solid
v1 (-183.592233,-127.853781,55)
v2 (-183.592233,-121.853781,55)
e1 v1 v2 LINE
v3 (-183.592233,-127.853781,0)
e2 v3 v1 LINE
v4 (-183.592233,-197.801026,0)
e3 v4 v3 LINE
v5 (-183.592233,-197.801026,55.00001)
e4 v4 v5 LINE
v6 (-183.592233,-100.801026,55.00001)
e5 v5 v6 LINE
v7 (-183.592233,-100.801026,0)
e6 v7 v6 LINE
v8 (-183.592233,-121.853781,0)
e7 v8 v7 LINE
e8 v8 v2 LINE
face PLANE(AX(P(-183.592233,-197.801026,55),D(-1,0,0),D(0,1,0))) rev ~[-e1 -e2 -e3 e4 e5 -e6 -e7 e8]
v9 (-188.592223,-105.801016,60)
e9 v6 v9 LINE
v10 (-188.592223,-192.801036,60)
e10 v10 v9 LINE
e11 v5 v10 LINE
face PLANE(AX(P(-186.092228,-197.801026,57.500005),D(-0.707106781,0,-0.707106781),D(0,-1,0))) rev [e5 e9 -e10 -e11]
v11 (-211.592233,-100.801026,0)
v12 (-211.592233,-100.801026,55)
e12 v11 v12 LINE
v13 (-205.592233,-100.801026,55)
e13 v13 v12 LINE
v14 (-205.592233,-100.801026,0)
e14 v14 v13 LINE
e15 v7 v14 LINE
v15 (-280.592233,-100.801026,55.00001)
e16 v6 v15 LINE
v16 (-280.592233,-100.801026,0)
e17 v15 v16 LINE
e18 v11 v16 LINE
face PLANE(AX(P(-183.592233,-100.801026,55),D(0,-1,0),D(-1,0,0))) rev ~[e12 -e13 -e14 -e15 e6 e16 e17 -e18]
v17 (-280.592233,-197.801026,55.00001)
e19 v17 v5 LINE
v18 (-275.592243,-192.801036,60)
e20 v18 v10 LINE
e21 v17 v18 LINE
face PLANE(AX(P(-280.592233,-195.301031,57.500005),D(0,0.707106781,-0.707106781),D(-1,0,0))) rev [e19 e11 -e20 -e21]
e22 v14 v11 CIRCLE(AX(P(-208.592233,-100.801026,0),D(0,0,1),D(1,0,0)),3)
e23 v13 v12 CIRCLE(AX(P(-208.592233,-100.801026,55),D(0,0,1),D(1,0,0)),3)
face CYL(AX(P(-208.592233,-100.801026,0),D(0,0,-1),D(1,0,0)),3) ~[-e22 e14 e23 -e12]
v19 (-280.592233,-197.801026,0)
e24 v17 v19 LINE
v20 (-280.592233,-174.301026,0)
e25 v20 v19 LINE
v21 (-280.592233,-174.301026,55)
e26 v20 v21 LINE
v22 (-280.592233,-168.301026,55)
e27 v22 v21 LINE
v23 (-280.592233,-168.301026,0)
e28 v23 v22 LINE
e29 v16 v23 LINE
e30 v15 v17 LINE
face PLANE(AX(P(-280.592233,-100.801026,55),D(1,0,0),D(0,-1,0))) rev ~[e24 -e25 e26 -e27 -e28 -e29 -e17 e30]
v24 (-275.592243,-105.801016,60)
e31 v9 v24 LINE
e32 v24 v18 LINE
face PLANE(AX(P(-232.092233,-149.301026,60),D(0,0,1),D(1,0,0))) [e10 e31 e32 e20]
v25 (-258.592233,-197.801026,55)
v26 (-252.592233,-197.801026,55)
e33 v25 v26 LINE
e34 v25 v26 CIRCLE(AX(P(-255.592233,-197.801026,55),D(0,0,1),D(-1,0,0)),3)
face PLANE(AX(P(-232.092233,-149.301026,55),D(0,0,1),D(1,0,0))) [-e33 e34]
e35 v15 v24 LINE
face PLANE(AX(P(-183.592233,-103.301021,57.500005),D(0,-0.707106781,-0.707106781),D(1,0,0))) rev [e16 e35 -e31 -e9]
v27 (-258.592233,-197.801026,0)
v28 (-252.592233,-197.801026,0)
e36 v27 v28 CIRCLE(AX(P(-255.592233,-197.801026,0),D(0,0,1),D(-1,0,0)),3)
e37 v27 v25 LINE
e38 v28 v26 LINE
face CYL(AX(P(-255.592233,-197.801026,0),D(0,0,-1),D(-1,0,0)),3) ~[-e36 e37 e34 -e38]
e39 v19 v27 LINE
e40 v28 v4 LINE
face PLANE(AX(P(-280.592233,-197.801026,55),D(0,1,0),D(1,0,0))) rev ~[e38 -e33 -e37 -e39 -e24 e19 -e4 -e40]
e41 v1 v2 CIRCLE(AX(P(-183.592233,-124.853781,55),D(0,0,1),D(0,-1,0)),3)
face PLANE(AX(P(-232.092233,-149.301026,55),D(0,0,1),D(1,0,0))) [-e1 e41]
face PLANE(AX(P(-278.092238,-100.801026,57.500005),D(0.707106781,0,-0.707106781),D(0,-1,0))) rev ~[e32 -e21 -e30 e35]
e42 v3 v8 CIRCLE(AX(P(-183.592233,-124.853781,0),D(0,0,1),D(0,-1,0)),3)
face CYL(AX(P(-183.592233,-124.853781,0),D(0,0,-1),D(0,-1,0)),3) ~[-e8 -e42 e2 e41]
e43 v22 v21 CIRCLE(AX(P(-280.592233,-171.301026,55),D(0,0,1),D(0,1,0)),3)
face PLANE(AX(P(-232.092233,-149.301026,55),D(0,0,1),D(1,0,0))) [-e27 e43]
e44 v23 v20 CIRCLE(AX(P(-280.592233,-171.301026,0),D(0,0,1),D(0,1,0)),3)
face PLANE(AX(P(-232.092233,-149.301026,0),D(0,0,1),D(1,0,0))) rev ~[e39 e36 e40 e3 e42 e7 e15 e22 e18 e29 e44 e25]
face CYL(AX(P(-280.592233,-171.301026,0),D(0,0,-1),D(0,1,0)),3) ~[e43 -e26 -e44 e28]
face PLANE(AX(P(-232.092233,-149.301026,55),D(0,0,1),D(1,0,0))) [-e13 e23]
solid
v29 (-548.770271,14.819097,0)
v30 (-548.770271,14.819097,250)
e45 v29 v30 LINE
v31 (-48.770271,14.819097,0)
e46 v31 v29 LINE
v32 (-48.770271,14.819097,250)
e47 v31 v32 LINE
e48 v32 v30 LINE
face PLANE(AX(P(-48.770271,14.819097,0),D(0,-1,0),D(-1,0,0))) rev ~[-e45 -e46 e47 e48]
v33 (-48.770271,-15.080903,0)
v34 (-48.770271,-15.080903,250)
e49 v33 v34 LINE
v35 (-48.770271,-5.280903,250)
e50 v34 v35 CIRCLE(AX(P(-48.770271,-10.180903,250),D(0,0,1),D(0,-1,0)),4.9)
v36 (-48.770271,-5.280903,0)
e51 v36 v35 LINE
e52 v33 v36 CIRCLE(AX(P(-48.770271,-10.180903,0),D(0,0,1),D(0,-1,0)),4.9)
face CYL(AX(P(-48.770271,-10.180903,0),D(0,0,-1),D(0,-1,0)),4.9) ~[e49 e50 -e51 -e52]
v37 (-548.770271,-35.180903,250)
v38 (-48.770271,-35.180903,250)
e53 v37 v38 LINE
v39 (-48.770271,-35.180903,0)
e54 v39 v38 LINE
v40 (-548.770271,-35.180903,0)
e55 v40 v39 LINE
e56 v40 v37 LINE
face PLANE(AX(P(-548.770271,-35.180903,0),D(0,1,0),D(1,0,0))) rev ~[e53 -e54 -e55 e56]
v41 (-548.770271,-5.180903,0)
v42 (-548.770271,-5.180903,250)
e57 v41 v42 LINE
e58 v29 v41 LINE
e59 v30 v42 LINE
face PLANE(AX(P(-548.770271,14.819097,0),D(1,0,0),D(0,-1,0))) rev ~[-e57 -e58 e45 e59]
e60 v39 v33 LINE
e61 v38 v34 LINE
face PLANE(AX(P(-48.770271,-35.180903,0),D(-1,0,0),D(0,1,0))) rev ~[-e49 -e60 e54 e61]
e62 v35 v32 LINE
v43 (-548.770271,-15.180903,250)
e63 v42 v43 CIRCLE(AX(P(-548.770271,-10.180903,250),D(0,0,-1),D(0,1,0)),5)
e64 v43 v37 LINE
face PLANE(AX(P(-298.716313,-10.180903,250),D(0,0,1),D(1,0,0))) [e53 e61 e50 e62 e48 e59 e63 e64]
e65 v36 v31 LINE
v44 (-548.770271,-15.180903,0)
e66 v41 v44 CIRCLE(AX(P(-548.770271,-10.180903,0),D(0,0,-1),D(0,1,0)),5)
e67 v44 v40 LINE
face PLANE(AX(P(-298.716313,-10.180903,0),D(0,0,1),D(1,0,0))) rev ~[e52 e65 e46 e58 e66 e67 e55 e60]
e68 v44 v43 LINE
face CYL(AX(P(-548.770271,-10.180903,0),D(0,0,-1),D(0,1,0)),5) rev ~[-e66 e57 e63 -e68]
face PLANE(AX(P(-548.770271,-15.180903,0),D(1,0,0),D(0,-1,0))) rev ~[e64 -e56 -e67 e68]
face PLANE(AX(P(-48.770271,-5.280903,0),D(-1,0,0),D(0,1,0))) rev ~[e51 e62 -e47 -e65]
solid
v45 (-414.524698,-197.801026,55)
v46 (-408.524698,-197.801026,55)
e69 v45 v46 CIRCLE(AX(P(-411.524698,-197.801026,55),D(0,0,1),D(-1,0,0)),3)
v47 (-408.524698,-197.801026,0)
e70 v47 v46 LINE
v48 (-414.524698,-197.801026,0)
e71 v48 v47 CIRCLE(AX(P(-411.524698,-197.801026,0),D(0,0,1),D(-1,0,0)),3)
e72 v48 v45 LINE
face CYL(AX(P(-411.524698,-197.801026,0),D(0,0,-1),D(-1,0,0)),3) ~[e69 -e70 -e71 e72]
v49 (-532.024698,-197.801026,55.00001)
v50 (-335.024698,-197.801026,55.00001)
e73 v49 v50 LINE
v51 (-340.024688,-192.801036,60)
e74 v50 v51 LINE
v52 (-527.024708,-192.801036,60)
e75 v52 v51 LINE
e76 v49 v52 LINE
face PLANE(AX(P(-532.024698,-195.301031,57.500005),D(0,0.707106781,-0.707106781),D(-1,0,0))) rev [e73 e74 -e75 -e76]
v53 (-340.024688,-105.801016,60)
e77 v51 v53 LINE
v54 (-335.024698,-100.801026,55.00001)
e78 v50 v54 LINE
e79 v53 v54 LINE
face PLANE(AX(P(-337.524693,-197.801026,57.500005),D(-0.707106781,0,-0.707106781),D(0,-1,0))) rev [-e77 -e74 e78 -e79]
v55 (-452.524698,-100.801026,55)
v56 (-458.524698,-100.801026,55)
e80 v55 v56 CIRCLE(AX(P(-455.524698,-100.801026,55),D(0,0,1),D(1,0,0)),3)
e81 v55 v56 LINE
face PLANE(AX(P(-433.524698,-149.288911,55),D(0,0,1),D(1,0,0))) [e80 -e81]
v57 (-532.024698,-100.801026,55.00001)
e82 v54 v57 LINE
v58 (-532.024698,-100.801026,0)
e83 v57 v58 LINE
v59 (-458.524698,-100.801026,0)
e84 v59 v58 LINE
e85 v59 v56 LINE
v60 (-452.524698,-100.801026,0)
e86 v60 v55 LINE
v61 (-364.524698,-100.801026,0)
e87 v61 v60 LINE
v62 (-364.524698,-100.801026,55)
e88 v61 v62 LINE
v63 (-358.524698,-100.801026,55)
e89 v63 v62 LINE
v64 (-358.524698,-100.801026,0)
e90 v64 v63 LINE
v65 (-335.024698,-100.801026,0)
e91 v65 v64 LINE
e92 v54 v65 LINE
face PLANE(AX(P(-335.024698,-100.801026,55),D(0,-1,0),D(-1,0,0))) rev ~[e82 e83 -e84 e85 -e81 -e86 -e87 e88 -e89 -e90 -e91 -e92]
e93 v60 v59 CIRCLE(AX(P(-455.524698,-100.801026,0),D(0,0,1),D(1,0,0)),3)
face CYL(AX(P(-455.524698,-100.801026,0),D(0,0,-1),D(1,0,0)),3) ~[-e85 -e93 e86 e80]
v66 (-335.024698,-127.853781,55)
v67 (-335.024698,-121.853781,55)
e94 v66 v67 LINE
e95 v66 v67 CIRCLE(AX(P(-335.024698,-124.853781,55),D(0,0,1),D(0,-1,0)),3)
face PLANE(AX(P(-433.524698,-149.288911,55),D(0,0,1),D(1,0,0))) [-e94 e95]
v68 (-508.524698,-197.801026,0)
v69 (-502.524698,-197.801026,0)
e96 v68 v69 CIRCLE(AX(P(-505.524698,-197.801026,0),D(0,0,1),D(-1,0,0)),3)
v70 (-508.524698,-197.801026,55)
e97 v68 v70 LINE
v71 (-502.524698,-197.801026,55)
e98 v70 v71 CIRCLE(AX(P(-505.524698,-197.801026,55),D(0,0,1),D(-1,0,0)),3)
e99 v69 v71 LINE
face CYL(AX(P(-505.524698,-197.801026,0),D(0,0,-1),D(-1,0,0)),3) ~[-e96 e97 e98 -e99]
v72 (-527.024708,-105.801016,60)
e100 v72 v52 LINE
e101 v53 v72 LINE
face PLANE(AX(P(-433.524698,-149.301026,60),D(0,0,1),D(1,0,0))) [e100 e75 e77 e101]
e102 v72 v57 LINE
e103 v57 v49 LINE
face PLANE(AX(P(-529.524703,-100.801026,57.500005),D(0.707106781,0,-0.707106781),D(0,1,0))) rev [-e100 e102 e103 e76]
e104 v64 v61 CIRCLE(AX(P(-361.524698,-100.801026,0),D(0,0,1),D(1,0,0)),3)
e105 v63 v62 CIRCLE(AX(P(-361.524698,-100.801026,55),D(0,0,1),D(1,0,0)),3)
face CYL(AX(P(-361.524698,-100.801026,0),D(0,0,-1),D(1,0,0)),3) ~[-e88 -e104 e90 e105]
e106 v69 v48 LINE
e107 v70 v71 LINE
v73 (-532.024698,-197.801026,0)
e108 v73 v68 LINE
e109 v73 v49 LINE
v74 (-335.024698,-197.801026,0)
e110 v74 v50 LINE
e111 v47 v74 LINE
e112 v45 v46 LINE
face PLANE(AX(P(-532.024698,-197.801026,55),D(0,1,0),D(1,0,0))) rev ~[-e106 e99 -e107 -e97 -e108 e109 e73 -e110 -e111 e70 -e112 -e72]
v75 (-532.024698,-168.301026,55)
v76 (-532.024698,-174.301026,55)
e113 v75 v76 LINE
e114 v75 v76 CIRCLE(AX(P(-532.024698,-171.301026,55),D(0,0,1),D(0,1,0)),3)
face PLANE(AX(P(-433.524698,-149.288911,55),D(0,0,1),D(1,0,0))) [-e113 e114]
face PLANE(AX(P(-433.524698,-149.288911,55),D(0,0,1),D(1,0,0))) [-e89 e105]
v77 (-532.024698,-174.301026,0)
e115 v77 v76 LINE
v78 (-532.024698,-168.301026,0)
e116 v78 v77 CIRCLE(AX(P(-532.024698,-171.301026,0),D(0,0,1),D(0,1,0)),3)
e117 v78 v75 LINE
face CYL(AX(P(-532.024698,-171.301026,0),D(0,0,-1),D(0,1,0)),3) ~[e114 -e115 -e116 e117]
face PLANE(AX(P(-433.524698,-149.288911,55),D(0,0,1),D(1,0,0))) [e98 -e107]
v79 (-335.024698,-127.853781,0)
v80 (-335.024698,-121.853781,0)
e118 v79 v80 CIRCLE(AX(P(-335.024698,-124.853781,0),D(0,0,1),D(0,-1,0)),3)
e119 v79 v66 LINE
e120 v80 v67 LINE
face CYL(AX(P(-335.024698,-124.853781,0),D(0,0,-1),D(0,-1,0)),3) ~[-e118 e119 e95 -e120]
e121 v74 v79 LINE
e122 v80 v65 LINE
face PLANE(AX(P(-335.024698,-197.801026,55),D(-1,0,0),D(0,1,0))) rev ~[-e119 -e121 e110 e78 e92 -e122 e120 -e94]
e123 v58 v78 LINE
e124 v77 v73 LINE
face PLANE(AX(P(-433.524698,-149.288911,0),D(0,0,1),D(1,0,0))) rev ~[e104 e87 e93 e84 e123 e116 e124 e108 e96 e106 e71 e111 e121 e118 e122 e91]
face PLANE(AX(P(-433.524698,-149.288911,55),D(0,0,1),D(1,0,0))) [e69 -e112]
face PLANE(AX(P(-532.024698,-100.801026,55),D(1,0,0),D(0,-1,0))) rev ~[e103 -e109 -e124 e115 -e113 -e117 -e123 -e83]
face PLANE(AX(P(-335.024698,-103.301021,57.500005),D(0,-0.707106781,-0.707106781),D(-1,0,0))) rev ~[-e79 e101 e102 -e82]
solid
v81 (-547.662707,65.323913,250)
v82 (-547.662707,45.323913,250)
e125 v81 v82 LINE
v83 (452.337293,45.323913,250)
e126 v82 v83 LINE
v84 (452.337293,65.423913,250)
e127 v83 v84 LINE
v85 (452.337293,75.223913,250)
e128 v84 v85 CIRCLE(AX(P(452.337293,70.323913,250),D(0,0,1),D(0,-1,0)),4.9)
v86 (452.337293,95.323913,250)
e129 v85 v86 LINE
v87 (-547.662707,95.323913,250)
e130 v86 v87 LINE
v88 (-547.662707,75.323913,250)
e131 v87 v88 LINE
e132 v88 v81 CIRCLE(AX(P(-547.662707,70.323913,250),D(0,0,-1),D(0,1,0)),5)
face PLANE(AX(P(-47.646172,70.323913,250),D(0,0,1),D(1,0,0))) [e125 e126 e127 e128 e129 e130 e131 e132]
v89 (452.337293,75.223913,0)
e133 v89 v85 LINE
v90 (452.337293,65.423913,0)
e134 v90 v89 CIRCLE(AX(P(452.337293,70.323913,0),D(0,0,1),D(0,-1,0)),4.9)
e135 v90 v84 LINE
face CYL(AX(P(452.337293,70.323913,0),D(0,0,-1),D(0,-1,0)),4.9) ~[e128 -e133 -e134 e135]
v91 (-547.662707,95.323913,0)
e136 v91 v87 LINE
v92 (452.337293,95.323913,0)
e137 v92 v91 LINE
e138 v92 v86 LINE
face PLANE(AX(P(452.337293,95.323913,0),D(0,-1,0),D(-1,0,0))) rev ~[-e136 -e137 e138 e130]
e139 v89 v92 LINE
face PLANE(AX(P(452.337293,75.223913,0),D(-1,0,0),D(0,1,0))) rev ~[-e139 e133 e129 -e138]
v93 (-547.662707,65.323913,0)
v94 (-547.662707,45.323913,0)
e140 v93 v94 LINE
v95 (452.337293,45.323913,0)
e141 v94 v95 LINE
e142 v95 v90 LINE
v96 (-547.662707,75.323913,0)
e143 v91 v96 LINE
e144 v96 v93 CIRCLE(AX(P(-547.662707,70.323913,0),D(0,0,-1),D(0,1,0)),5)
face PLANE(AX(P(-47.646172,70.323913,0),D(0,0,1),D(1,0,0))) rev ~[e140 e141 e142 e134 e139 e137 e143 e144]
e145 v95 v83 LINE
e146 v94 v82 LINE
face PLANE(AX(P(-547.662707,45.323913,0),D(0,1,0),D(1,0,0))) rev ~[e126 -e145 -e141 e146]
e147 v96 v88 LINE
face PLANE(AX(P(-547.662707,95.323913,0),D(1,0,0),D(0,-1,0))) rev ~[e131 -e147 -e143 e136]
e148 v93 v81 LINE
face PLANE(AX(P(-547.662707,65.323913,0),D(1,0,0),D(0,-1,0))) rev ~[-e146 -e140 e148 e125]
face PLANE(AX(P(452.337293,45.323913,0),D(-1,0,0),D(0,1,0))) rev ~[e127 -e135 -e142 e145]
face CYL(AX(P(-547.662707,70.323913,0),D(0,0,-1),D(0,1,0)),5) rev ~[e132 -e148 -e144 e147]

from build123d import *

# Parameters (mm, degrees)
F1_DEPTH = 250
F3_DEPTH = 55
F5_DEPTH = 5
F6_SIZE  = 4.99999
F8_DEPTH = 5
F9_SIZE  = 4.99999


# Not quite as in the source:
# - a fillet or chamfer is up to 0.001 mm smaller than in the source, because OpenCascade refuses the exact size
# - a feature names something its author has since deleted; it is built from what else it names


with BuildPart() as f1:
    # F0 (on Top) → F1 (new body)
    with BuildSketch(Plane.XY):
        with BuildLine():
            Line((-547.6627070457, 65.3239125144), (-547.6627070457, 45.3239125144))
            Line((-547.6627070457, 45.3239125144), (452.3372929543, 45.3239125144))
            Line((452.3372929543, 45.3239125144), (452.3372929543, 65.4239125144))
            ThreePointArc((452.3372929543, 65.4239125144), (457.2372929543, 70.3239125144), (452.3372929543, 75.2239125144))
            Line((452.3372929543, 75.2239125144), (452.3372929543, 95.3239125144))
            Line((452.3372929543, 95.3239125144), (-547.6627070457, 95.3239125144))
            Line((-547.6627070457, 95.3239125144), (-547.6627070457, 75.3239125144))
            ThreePointArc((-547.6627070457, 75.3239125144), (-542.6627070457, 70.3239125144), (-547.6627070457, 65.3239125144))
        make_face()
    extrude(amount=F1_DEPTH)


with BuildPart() as f1b:
    # F0 (on Top) → F1, piece 2 (new body)
    with BuildSketch(Plane.XY):
        with BuildLine():
            Line((-548.7702705837, -15.180903133), (-548.7702705837, -35.180903133))
            Line((-548.7702705837, -35.180903133), (-48.7702705837, -35.180903133))
            Line((-48.7702705837, -35.180903133), (-48.7702705837, -15.080903133))
            ThreePointArc((-48.7702705837, -15.080903133), (-43.8702705837, -10.180903133), (-48.7702705837, -5.280903133))
            Line((-48.7702705837, -5.280903133), (-48.7702705837, 14.819096867))
            Line((-48.7702705837, 14.819096867), (-548.7702705837, 14.819096867))
            Line((-548.7702705837, 14.819096867), (-548.7702705837, -5.180903133))
            ThreePointArc((-548.7702705837, -5.180903133), (-543.7702705837, -10.180903133), (-548.7702705837, -15.180903133))
        make_face()
    extrude(amount=F1_DEPTH)


with BuildPart() as f3:
    # F2 (on Top) → F3 (new body)
    with BuildSketch(Plane.XY):
        with BuildLine():
            Line((-532.024698019, -197.8010260633), (-508.524698019, -197.8010260633))
            ThreePointArc((-508.524698019, -197.8010260633), (-505.524698019, -200.8010260633), (-502.524698019, -197.8010260633))
            Line((-502.524698019, -197.8010260633), (-414.524698019, -197.8010260633))
            ThreePointArc((-414.524698019, -197.8010260633), (-411.524698019, -200.8010260633), (-408.524698019, -197.8010260633))
            Line((-408.524698019, -197.8010260633), (-335.024698019, -197.8010260633))
            Line((-335.024698019, -197.8010260633), (-335.024698019, -127.8537809849))
            ThreePointArc((-335.024698019, -127.8537809849), (-332.024698019, -124.8537809849), (-335.024698019, -121.8537809849))
            Line((-335.024698019, -121.8537809849), (-335.024698019, -100.8010260633))
            Line((-335.024698019, -100.8010260633), (-358.524698019, -100.8010260633))
            ThreePointArc((-358.524698019, -100.8010260633), (-361.524698019, -97.8010260633), (-364.524698019, -100.8010260633))
            Line((-364.524698019, -100.8010260633), (-452.524698019, -100.8010260633))
            ThreePointArc((-452.524698019, -100.8010260633), (-455.524698019, -97.8010260633), (-458.524698019, -100.8010260633))
            Line((-458.524698019, -100.8010260633), (-532.024698019, -100.8010260633))
            Line((-532.024698019, -100.8010260633), (-532.024698019, -168.3010260633))
            ThreePointArc((-532.024698019, -168.3010260633), (-535.024698019, -171.3010260633), (-532.024698019, -174.3010260633))
            Line((-532.024698019, -174.3010260633), (-532.024698019, -197.8010260633))
        make_face()
    extrude(amount=F3_DEPTH)

    # F4 (on face) → F5 (join)
    with BuildSketch(Plane.XY.offset(55)):
        Polygon((-532.024698019, -100.8010260633), (-532.024698019, -168.3010260633), (-532.024698019, -174.3010260633), (-532.024698019, -197.8010260633), (-508.524698019, -197.8010260633), (-502.524698019, -197.8010260633), (-414.524698019, -197.8010260633), (-408.524698019, -197.8010260633), (-335.024698019, -197.8010260633), (-335.024698019, -127.8537809849), (-335.024698019, -121.8537809849), (-335.024698019, -100.8010260633), (-358.524698019, -100.8010260633), (-364.524698019, -100.8010260633), (-452.524698019, -100.8010260633), (-458.524698019, -100.8010260633), align=None)
    extrude(amount=F5_DEPTH)

    # F6 (size 5 in the source; OpenCascade refuses exactly that, so slightly less here)
    f6_edges = [f3.edges().sort_by_distance(p)[0] for p in [
        (-433.524698, -100.801026, 60),
        (-532.024698, -149.301026, 60),
        (-433.524698, -197.801026, 60),
        (-335.024698, -149.301026, 60),
    ]]
    chamfer(f6_edges, length=F6_SIZE)


with BuildPart() as f3b:
    # F2 (on Top) → F3, piece 2 (new body)
    with BuildSketch(Plane.XY):
        Polygon((-280.5922329426, -174.3010260633), (-280.5922329426, -197.8010260633), (-258.5922329426, -197.8010260633), (-252.5922329426, -197.8010260633), (-183.5922329426, -197.8010260633), (-183.5922329426, -127.8537809849), (-183.5922329426, -121.8537809849), (-183.5922329426, -100.8010260633), (-205.5922329426, -100.8010260633), (-211.5922329426, -100.8010260633), (-280.5922329426, -100.8010260633), (-280.5922329426, -168.3010260633), align=None)
        with BuildLine():
            ThreePointArc((-280.5922329426, -168.3010260633), (-283.5922329426, -171.3010260633), (-280.5922329426, -174.3010260633))
            Line((-280.5922329426, -174.3010260633), (-280.5922329426, -168.3010260633))
        make_face()
        with BuildLine():
            Line((-252.5922329426, -197.8010260633), (-258.5922329426, -197.8010260633))
            ThreePointArc((-258.5922329426, -197.8010260633), (-255.5922329426, -200.8010260633), (-252.5922329426, -197.8010260633))
        make_face()
        with BuildLine():
            Line((-183.5922329426, -121.8537809849), (-183.5922329426, -127.8537809849))
            ThreePointArc((-183.5922329426, -127.8537809849), (-180.5922329426, -124.8537809849), (-183.5922329426, -121.8537809849))
        make_face()
        with BuildLine():
            ThreePointArc((-205.5922329426, -100.8010260633), (-208.5922329426, -97.8010260633), (-211.5922329426, -100.8010260633))
            Line((-211.5922329426, -100.8010260633), (-205.5922329426, -100.8010260633))
        make_face()
    extrude(amount=F3_DEPTH)

    # F7 (on face) → F8 (join)
    with BuildSketch(Plane.XY.offset(55)):
        Polygon((-280.5922329426, -168.3010260633), (-280.5922329426, -174.3010260633), (-280.5922329426, -197.8010260633), (-258.5922329426, -197.8010260633), (-252.5922329426, -197.8010260633), (-183.5922329426, -197.8010260633), (-183.5922329426, -127.8537809849), (-183.5922329426, -121.8537809849), (-183.5922329426, -100.8010260633), (-205.5922329426, -100.8010260633), (-211.5922329426, -100.8010260633), (-280.5922329426, -100.8010260633), align=None)
    extrude(amount=F8_DEPTH)

    # F9 (size 5 in the source; OpenCascade refuses exactly that, so slightly less here)
    f9_edges = [f3b.edges().sort_by_distance(p)[0] for p in [
        (-232.092233, -197.801026, 60),
        (-183.592233, -149.301026, 60),
        (-232.092233, -100.801026, 60),
        (-280.592233, -149.301026, 60),
    ]]
    chamfer(f9_edges, length=F9_SIZE)


solid = Compound([f1.part, f1b.part, f3.part, f3b.part])
